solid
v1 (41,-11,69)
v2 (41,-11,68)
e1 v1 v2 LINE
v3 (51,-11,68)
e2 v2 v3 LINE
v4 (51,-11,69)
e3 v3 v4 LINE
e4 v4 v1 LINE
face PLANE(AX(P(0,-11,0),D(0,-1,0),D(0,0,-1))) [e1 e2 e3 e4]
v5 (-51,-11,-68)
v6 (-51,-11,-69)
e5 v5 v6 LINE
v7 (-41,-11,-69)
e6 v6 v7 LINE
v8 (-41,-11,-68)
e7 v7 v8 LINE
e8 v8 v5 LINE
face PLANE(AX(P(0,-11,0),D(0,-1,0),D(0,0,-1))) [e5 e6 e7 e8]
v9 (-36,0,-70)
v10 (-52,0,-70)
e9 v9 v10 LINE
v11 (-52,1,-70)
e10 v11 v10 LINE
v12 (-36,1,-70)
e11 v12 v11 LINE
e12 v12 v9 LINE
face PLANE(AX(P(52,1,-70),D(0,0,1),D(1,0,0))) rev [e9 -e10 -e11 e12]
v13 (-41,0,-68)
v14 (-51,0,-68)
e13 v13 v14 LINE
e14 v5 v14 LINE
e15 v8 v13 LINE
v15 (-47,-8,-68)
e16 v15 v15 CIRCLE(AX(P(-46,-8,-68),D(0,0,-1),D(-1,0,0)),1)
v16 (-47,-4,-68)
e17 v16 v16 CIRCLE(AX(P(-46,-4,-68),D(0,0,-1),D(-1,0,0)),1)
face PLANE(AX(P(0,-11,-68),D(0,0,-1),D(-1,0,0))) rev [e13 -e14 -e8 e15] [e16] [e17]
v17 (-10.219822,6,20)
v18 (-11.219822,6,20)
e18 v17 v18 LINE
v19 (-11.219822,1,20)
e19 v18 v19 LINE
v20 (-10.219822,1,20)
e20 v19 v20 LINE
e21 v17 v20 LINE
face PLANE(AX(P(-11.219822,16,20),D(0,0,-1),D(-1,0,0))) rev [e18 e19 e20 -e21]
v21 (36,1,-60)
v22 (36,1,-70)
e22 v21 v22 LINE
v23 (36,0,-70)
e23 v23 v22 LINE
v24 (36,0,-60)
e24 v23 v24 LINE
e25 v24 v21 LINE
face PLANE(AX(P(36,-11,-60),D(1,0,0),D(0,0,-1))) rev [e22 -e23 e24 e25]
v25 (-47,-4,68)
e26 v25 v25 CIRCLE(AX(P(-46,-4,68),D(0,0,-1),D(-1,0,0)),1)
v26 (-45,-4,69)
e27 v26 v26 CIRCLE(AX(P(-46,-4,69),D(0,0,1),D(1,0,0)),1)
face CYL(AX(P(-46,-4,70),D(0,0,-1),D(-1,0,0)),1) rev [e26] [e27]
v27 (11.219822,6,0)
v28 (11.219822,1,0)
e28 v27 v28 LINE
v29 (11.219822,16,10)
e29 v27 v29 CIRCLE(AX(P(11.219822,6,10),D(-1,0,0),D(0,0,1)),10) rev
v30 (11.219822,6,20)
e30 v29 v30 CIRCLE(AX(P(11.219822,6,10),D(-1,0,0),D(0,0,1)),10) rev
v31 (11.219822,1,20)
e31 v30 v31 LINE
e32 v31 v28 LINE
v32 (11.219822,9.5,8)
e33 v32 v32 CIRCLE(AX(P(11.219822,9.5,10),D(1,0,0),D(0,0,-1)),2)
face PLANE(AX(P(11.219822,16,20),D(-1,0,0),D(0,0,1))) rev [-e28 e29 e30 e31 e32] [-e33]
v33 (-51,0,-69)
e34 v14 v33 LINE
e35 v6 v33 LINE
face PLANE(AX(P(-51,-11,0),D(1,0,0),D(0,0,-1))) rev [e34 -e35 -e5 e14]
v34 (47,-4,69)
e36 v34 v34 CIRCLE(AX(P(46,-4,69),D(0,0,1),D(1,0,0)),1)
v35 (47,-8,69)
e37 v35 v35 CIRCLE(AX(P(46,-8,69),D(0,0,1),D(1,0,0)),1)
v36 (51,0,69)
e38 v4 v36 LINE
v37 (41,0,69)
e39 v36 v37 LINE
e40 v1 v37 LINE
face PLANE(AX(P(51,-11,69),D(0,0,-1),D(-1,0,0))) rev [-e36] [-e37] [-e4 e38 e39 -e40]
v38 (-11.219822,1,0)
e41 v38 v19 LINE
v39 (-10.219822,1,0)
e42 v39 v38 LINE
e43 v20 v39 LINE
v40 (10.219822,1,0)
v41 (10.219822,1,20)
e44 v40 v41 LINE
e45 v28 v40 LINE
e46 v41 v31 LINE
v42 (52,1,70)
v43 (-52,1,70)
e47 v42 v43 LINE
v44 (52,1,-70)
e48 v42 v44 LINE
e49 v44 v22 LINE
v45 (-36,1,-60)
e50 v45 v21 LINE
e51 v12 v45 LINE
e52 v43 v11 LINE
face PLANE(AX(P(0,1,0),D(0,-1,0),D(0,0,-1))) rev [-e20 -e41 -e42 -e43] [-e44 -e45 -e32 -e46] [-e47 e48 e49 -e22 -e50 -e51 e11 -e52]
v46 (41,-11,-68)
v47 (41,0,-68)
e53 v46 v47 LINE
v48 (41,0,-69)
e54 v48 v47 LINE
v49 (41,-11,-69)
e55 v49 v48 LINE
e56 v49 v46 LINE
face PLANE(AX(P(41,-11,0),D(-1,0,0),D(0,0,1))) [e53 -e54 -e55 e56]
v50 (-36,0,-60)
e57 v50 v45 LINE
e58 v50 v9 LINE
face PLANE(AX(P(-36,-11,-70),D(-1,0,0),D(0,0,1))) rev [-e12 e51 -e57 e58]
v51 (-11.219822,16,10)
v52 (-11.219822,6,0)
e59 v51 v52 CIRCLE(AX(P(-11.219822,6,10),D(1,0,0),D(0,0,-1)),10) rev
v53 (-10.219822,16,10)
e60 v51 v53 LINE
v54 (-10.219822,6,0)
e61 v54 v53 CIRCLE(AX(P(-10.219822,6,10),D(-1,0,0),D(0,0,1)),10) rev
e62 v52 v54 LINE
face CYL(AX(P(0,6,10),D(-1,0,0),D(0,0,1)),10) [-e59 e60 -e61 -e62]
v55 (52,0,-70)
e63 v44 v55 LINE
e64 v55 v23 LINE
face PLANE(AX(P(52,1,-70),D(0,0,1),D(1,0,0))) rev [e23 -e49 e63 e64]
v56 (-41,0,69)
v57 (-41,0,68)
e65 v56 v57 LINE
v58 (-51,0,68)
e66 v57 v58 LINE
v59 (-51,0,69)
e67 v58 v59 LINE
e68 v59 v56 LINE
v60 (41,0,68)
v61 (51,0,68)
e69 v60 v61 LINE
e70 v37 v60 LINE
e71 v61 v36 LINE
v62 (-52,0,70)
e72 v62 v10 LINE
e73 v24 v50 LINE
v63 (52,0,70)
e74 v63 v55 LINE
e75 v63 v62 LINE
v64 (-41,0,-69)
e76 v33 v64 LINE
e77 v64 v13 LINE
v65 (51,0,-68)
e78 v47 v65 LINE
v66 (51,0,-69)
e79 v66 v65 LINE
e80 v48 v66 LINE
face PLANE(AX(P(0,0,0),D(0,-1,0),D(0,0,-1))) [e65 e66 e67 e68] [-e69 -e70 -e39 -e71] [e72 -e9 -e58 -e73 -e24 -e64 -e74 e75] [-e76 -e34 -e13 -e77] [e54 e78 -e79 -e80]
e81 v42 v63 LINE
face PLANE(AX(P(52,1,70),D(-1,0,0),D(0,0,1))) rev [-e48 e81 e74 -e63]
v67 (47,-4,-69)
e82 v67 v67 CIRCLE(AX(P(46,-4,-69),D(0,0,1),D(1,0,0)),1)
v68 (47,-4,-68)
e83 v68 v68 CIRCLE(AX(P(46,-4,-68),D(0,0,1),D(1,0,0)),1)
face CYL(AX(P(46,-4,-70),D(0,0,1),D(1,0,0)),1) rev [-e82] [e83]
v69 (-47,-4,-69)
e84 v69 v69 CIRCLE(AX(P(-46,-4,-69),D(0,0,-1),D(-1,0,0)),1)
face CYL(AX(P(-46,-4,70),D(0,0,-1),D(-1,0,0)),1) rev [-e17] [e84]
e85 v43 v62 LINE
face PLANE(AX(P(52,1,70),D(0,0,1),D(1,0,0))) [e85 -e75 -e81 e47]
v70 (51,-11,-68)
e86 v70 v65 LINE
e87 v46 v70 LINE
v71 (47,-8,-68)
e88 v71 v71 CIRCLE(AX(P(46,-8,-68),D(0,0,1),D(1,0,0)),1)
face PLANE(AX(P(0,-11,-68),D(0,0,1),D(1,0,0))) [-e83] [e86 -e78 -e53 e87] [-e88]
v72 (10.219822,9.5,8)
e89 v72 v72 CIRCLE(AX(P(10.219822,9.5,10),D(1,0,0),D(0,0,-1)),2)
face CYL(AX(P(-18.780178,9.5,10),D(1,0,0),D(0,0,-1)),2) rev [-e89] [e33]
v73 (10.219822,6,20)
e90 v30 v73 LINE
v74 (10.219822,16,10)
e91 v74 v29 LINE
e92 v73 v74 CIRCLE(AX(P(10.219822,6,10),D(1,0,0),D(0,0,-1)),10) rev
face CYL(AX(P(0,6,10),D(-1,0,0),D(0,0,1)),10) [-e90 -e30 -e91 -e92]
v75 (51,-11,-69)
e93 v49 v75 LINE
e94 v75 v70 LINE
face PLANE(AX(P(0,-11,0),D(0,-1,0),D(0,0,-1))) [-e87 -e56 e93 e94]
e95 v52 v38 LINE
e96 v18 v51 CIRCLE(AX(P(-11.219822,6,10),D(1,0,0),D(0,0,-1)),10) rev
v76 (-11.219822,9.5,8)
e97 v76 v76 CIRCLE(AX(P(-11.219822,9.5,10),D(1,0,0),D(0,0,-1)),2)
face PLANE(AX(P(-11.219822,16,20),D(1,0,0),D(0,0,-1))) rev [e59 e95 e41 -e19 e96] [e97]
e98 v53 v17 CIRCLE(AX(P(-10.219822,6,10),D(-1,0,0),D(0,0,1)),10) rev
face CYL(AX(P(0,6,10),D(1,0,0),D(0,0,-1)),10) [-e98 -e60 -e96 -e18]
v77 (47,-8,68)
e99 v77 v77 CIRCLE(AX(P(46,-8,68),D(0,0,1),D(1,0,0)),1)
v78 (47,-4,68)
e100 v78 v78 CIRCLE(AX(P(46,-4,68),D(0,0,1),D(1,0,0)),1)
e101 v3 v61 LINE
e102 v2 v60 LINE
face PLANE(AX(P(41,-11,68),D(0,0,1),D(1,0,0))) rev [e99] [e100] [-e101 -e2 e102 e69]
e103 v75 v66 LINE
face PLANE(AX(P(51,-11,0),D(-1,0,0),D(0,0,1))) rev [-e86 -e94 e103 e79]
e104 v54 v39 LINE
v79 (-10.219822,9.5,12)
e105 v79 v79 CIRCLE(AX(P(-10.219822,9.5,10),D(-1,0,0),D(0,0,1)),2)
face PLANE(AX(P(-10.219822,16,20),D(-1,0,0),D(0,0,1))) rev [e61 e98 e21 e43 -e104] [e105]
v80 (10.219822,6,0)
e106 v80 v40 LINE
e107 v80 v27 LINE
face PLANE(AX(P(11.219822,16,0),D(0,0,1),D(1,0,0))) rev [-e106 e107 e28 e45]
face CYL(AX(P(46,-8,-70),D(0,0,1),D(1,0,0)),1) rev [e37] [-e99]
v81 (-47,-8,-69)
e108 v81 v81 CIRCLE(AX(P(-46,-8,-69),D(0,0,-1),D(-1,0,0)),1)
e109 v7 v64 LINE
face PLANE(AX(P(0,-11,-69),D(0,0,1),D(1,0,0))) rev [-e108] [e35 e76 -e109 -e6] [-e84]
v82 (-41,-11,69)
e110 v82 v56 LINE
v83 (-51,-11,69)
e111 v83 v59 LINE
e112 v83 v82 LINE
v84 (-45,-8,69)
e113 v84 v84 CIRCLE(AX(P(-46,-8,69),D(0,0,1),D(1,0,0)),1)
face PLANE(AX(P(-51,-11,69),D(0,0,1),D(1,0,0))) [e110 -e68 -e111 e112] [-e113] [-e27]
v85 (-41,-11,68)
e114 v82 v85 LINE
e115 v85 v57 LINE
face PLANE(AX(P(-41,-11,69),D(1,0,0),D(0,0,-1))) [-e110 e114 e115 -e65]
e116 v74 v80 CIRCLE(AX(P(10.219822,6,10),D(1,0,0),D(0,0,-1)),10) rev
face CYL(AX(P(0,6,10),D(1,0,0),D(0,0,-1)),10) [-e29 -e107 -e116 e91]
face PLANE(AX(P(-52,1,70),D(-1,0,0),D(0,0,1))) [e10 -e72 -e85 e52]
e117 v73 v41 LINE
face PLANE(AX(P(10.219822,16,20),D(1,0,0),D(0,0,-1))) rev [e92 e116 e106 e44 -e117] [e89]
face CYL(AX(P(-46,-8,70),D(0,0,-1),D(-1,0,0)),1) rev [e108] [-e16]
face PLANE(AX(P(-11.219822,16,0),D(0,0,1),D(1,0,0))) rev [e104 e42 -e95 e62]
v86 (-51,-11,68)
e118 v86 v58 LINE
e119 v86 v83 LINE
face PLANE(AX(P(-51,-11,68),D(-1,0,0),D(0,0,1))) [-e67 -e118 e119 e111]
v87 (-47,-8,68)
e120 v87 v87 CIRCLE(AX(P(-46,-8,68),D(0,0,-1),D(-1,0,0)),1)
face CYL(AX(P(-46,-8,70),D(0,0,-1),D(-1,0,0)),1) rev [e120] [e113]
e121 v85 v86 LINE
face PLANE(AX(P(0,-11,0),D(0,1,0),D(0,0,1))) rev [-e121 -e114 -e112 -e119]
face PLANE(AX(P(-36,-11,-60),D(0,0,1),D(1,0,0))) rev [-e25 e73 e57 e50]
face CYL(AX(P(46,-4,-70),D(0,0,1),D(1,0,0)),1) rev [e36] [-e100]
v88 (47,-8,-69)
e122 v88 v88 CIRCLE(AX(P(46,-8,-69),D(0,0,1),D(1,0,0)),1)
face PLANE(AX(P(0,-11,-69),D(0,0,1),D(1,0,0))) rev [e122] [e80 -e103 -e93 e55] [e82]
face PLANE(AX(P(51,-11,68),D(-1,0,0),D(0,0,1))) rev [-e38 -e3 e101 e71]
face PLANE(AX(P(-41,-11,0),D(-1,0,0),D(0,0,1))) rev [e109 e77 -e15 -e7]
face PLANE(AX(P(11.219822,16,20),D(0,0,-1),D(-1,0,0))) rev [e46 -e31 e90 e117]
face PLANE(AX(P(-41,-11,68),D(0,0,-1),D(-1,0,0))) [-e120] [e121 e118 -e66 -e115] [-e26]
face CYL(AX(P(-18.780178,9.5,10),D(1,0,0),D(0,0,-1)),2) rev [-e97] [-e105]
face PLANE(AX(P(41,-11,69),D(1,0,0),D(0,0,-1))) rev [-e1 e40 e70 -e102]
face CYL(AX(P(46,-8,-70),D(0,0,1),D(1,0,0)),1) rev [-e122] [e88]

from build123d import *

# Parameters (mm, degrees)
SKETCH1_W           = 104
SKETCH1_H           = 140
BOSS_EXTRUDE1_DEPTH = 1
SKETCH2_W           = 1
SKETCH2_H           = 20
BOSS_EXTRUDE2_DEPTH = 15
SKETCH6_R           = 2
CUT_EXTRUDE1_DEPTH  = 30
FILLET3_R           = 10
FILLET4_R           = 10
FILLET5_R           = 10
FILLET6_R           = 10
SKETCH9_W           = 10
SKETCH9_H           = 1
BOSS_EXTRUDE5_DEPTH = 11
SKETCH10_R          = 1
CUT_EXTRUDE2_DEPTH  = 150.268214969
SKETCH12_R          = 1
CUT_EXTRUDE3_DEPTH  = 150.268214969
CUT_EXTRUDE4_DEPTH  = 12


with BuildPart() as part:
    # Sketch1 → Boss-Extrude1 (new body)
    with BuildSketch(Plane(origin=(0, 0, 0), x_dir=(1, 0, 0), z_dir=(0, 1, 0))):
        Rectangle(SKETCH1_W, SKETCH1_H)
    extrude(amount=BOSS_EXTRUDE1_DEPTH)

    # Sketch2 → Boss-Extrude2 (add)
    with BuildSketch(Plane(origin=(0, 1, 0), x_dir=(1, 0, 0), z_dir=(0, 1, 0))):
        with Locations((-10.719821852, -10)):
            Rectangle(SKETCH2_W, SKETCH2_H)
        with Locations((10.719821852, -10)):
            Rectangle(SKETCH2_W, SKETCH2_H)
    extrude(amount=BOSS_EXTRUDE2_DEPTH)

    # Sketch6 → Cut-Extrude1 (cut)
    with BuildSketch(Plane(origin=(11.219821852, 0, 0), x_dir=(0, 0, -1), z_dir=(1, 0, 0))):
        with Locations((-10, 9.5)):
            Circle(SKETCH6_R)
    extrude(amount=-CUT_EXTRUDE1_DEPTH, mode=Mode.SUBTRACT)

    # Fillet3
    fillet3_edges = [part.edges().sort_by_distance(p)[0] for p in [
        (10.719821852, 16, 20),
    ]]
    fillet(fillet3_edges, radius=FILLET3_R)

    # Fillet4
    fillet4_edges = [part.edges().sort_by_distance(p)[0] for p in [
        (10.719821852, 16, 0),
    ]]
    fillet(fillet4_edges, radius=FILLET4_R - 0.0001)  # a hair under: the kernel refuses the full size

    # Fillet5
    fillet5_edges = [part.edges().sort_by_distance(p)[0] for p in [
        (-10.719821852, 16, 20),
    ]]
    fillet(fillet5_edges, radius=FILLET5_R)

    # Fillet6
    fillet6_edges = [part.edges().sort_by_distance(p)[0] for p in [
        (-10.719821852, 16, 0),
    ]]
    fillet(fillet6_edges, radius=FILLET6_R - 0.0001)  # a hair under: the kernel refuses the full size

    # Sketch9 → Boss-Extrude5 (add)
    with BuildSketch(Plane.XZ):
        with Locations((46, -68.5)):
            Rectangle(SKETCH9_W, SKETCH9_H)
        with Locations((-46, -68.5)):
            Rectangle(SKETCH9_W, SKETCH9_H)
        with Locations((-46, 68.5)):
            Rectangle(SKETCH9_W, SKETCH9_H)
        with Locations((46, 68.5)):
            Rectangle(SKETCH9_W, SKETCH9_H)
    extrude(amount=BOSS_EXTRUDE5_DEPTH)

    # Sketch10 → Cut-Extrude2 (cut, through all)
    with BuildSketch(Plane(origin=(0, 0, -69), x_dir=(-1, 0, 0), z_dir=(0, 0, -1))):
        with Locations((46, -8)):
            Circle(SKETCH10_R)
        with Locations((46, -4)):
            Circle(SKETCH10_R)
    extrude(amount=-CUT_EXTRUDE2_DEPTH, mode=Mode.SUBTRACT)

    # Sketch12 → Cut-Extrude3 (cut, through all)
    with BuildSketch(Plane.XY.offset(69)):
        with Locations((46, -4)):
            Circle(SKETCH12_R)
        with Locations((46, -8)):
            Circle(SKETCH12_R)
    extrude(amount=-CUT_EXTRUDE3_DEPTH, mode=Mode.SUBTRACT)

    # Sketch13 → Cut-Extrude4 (cut)
    with BuildSketch(Plane(origin=(0, 1, 0), x_dir=(1, 0, 0), z_dir=(0, 1, 0))):
        Polygon((0, 70), (-36, 70), (-36, 60), (36, 60), (36, 70), align=None)
    extrude(amount=-CUT_EXTRUDE4_DEPTH, mode=Mode.SUBTRACT)


solid = part.part
